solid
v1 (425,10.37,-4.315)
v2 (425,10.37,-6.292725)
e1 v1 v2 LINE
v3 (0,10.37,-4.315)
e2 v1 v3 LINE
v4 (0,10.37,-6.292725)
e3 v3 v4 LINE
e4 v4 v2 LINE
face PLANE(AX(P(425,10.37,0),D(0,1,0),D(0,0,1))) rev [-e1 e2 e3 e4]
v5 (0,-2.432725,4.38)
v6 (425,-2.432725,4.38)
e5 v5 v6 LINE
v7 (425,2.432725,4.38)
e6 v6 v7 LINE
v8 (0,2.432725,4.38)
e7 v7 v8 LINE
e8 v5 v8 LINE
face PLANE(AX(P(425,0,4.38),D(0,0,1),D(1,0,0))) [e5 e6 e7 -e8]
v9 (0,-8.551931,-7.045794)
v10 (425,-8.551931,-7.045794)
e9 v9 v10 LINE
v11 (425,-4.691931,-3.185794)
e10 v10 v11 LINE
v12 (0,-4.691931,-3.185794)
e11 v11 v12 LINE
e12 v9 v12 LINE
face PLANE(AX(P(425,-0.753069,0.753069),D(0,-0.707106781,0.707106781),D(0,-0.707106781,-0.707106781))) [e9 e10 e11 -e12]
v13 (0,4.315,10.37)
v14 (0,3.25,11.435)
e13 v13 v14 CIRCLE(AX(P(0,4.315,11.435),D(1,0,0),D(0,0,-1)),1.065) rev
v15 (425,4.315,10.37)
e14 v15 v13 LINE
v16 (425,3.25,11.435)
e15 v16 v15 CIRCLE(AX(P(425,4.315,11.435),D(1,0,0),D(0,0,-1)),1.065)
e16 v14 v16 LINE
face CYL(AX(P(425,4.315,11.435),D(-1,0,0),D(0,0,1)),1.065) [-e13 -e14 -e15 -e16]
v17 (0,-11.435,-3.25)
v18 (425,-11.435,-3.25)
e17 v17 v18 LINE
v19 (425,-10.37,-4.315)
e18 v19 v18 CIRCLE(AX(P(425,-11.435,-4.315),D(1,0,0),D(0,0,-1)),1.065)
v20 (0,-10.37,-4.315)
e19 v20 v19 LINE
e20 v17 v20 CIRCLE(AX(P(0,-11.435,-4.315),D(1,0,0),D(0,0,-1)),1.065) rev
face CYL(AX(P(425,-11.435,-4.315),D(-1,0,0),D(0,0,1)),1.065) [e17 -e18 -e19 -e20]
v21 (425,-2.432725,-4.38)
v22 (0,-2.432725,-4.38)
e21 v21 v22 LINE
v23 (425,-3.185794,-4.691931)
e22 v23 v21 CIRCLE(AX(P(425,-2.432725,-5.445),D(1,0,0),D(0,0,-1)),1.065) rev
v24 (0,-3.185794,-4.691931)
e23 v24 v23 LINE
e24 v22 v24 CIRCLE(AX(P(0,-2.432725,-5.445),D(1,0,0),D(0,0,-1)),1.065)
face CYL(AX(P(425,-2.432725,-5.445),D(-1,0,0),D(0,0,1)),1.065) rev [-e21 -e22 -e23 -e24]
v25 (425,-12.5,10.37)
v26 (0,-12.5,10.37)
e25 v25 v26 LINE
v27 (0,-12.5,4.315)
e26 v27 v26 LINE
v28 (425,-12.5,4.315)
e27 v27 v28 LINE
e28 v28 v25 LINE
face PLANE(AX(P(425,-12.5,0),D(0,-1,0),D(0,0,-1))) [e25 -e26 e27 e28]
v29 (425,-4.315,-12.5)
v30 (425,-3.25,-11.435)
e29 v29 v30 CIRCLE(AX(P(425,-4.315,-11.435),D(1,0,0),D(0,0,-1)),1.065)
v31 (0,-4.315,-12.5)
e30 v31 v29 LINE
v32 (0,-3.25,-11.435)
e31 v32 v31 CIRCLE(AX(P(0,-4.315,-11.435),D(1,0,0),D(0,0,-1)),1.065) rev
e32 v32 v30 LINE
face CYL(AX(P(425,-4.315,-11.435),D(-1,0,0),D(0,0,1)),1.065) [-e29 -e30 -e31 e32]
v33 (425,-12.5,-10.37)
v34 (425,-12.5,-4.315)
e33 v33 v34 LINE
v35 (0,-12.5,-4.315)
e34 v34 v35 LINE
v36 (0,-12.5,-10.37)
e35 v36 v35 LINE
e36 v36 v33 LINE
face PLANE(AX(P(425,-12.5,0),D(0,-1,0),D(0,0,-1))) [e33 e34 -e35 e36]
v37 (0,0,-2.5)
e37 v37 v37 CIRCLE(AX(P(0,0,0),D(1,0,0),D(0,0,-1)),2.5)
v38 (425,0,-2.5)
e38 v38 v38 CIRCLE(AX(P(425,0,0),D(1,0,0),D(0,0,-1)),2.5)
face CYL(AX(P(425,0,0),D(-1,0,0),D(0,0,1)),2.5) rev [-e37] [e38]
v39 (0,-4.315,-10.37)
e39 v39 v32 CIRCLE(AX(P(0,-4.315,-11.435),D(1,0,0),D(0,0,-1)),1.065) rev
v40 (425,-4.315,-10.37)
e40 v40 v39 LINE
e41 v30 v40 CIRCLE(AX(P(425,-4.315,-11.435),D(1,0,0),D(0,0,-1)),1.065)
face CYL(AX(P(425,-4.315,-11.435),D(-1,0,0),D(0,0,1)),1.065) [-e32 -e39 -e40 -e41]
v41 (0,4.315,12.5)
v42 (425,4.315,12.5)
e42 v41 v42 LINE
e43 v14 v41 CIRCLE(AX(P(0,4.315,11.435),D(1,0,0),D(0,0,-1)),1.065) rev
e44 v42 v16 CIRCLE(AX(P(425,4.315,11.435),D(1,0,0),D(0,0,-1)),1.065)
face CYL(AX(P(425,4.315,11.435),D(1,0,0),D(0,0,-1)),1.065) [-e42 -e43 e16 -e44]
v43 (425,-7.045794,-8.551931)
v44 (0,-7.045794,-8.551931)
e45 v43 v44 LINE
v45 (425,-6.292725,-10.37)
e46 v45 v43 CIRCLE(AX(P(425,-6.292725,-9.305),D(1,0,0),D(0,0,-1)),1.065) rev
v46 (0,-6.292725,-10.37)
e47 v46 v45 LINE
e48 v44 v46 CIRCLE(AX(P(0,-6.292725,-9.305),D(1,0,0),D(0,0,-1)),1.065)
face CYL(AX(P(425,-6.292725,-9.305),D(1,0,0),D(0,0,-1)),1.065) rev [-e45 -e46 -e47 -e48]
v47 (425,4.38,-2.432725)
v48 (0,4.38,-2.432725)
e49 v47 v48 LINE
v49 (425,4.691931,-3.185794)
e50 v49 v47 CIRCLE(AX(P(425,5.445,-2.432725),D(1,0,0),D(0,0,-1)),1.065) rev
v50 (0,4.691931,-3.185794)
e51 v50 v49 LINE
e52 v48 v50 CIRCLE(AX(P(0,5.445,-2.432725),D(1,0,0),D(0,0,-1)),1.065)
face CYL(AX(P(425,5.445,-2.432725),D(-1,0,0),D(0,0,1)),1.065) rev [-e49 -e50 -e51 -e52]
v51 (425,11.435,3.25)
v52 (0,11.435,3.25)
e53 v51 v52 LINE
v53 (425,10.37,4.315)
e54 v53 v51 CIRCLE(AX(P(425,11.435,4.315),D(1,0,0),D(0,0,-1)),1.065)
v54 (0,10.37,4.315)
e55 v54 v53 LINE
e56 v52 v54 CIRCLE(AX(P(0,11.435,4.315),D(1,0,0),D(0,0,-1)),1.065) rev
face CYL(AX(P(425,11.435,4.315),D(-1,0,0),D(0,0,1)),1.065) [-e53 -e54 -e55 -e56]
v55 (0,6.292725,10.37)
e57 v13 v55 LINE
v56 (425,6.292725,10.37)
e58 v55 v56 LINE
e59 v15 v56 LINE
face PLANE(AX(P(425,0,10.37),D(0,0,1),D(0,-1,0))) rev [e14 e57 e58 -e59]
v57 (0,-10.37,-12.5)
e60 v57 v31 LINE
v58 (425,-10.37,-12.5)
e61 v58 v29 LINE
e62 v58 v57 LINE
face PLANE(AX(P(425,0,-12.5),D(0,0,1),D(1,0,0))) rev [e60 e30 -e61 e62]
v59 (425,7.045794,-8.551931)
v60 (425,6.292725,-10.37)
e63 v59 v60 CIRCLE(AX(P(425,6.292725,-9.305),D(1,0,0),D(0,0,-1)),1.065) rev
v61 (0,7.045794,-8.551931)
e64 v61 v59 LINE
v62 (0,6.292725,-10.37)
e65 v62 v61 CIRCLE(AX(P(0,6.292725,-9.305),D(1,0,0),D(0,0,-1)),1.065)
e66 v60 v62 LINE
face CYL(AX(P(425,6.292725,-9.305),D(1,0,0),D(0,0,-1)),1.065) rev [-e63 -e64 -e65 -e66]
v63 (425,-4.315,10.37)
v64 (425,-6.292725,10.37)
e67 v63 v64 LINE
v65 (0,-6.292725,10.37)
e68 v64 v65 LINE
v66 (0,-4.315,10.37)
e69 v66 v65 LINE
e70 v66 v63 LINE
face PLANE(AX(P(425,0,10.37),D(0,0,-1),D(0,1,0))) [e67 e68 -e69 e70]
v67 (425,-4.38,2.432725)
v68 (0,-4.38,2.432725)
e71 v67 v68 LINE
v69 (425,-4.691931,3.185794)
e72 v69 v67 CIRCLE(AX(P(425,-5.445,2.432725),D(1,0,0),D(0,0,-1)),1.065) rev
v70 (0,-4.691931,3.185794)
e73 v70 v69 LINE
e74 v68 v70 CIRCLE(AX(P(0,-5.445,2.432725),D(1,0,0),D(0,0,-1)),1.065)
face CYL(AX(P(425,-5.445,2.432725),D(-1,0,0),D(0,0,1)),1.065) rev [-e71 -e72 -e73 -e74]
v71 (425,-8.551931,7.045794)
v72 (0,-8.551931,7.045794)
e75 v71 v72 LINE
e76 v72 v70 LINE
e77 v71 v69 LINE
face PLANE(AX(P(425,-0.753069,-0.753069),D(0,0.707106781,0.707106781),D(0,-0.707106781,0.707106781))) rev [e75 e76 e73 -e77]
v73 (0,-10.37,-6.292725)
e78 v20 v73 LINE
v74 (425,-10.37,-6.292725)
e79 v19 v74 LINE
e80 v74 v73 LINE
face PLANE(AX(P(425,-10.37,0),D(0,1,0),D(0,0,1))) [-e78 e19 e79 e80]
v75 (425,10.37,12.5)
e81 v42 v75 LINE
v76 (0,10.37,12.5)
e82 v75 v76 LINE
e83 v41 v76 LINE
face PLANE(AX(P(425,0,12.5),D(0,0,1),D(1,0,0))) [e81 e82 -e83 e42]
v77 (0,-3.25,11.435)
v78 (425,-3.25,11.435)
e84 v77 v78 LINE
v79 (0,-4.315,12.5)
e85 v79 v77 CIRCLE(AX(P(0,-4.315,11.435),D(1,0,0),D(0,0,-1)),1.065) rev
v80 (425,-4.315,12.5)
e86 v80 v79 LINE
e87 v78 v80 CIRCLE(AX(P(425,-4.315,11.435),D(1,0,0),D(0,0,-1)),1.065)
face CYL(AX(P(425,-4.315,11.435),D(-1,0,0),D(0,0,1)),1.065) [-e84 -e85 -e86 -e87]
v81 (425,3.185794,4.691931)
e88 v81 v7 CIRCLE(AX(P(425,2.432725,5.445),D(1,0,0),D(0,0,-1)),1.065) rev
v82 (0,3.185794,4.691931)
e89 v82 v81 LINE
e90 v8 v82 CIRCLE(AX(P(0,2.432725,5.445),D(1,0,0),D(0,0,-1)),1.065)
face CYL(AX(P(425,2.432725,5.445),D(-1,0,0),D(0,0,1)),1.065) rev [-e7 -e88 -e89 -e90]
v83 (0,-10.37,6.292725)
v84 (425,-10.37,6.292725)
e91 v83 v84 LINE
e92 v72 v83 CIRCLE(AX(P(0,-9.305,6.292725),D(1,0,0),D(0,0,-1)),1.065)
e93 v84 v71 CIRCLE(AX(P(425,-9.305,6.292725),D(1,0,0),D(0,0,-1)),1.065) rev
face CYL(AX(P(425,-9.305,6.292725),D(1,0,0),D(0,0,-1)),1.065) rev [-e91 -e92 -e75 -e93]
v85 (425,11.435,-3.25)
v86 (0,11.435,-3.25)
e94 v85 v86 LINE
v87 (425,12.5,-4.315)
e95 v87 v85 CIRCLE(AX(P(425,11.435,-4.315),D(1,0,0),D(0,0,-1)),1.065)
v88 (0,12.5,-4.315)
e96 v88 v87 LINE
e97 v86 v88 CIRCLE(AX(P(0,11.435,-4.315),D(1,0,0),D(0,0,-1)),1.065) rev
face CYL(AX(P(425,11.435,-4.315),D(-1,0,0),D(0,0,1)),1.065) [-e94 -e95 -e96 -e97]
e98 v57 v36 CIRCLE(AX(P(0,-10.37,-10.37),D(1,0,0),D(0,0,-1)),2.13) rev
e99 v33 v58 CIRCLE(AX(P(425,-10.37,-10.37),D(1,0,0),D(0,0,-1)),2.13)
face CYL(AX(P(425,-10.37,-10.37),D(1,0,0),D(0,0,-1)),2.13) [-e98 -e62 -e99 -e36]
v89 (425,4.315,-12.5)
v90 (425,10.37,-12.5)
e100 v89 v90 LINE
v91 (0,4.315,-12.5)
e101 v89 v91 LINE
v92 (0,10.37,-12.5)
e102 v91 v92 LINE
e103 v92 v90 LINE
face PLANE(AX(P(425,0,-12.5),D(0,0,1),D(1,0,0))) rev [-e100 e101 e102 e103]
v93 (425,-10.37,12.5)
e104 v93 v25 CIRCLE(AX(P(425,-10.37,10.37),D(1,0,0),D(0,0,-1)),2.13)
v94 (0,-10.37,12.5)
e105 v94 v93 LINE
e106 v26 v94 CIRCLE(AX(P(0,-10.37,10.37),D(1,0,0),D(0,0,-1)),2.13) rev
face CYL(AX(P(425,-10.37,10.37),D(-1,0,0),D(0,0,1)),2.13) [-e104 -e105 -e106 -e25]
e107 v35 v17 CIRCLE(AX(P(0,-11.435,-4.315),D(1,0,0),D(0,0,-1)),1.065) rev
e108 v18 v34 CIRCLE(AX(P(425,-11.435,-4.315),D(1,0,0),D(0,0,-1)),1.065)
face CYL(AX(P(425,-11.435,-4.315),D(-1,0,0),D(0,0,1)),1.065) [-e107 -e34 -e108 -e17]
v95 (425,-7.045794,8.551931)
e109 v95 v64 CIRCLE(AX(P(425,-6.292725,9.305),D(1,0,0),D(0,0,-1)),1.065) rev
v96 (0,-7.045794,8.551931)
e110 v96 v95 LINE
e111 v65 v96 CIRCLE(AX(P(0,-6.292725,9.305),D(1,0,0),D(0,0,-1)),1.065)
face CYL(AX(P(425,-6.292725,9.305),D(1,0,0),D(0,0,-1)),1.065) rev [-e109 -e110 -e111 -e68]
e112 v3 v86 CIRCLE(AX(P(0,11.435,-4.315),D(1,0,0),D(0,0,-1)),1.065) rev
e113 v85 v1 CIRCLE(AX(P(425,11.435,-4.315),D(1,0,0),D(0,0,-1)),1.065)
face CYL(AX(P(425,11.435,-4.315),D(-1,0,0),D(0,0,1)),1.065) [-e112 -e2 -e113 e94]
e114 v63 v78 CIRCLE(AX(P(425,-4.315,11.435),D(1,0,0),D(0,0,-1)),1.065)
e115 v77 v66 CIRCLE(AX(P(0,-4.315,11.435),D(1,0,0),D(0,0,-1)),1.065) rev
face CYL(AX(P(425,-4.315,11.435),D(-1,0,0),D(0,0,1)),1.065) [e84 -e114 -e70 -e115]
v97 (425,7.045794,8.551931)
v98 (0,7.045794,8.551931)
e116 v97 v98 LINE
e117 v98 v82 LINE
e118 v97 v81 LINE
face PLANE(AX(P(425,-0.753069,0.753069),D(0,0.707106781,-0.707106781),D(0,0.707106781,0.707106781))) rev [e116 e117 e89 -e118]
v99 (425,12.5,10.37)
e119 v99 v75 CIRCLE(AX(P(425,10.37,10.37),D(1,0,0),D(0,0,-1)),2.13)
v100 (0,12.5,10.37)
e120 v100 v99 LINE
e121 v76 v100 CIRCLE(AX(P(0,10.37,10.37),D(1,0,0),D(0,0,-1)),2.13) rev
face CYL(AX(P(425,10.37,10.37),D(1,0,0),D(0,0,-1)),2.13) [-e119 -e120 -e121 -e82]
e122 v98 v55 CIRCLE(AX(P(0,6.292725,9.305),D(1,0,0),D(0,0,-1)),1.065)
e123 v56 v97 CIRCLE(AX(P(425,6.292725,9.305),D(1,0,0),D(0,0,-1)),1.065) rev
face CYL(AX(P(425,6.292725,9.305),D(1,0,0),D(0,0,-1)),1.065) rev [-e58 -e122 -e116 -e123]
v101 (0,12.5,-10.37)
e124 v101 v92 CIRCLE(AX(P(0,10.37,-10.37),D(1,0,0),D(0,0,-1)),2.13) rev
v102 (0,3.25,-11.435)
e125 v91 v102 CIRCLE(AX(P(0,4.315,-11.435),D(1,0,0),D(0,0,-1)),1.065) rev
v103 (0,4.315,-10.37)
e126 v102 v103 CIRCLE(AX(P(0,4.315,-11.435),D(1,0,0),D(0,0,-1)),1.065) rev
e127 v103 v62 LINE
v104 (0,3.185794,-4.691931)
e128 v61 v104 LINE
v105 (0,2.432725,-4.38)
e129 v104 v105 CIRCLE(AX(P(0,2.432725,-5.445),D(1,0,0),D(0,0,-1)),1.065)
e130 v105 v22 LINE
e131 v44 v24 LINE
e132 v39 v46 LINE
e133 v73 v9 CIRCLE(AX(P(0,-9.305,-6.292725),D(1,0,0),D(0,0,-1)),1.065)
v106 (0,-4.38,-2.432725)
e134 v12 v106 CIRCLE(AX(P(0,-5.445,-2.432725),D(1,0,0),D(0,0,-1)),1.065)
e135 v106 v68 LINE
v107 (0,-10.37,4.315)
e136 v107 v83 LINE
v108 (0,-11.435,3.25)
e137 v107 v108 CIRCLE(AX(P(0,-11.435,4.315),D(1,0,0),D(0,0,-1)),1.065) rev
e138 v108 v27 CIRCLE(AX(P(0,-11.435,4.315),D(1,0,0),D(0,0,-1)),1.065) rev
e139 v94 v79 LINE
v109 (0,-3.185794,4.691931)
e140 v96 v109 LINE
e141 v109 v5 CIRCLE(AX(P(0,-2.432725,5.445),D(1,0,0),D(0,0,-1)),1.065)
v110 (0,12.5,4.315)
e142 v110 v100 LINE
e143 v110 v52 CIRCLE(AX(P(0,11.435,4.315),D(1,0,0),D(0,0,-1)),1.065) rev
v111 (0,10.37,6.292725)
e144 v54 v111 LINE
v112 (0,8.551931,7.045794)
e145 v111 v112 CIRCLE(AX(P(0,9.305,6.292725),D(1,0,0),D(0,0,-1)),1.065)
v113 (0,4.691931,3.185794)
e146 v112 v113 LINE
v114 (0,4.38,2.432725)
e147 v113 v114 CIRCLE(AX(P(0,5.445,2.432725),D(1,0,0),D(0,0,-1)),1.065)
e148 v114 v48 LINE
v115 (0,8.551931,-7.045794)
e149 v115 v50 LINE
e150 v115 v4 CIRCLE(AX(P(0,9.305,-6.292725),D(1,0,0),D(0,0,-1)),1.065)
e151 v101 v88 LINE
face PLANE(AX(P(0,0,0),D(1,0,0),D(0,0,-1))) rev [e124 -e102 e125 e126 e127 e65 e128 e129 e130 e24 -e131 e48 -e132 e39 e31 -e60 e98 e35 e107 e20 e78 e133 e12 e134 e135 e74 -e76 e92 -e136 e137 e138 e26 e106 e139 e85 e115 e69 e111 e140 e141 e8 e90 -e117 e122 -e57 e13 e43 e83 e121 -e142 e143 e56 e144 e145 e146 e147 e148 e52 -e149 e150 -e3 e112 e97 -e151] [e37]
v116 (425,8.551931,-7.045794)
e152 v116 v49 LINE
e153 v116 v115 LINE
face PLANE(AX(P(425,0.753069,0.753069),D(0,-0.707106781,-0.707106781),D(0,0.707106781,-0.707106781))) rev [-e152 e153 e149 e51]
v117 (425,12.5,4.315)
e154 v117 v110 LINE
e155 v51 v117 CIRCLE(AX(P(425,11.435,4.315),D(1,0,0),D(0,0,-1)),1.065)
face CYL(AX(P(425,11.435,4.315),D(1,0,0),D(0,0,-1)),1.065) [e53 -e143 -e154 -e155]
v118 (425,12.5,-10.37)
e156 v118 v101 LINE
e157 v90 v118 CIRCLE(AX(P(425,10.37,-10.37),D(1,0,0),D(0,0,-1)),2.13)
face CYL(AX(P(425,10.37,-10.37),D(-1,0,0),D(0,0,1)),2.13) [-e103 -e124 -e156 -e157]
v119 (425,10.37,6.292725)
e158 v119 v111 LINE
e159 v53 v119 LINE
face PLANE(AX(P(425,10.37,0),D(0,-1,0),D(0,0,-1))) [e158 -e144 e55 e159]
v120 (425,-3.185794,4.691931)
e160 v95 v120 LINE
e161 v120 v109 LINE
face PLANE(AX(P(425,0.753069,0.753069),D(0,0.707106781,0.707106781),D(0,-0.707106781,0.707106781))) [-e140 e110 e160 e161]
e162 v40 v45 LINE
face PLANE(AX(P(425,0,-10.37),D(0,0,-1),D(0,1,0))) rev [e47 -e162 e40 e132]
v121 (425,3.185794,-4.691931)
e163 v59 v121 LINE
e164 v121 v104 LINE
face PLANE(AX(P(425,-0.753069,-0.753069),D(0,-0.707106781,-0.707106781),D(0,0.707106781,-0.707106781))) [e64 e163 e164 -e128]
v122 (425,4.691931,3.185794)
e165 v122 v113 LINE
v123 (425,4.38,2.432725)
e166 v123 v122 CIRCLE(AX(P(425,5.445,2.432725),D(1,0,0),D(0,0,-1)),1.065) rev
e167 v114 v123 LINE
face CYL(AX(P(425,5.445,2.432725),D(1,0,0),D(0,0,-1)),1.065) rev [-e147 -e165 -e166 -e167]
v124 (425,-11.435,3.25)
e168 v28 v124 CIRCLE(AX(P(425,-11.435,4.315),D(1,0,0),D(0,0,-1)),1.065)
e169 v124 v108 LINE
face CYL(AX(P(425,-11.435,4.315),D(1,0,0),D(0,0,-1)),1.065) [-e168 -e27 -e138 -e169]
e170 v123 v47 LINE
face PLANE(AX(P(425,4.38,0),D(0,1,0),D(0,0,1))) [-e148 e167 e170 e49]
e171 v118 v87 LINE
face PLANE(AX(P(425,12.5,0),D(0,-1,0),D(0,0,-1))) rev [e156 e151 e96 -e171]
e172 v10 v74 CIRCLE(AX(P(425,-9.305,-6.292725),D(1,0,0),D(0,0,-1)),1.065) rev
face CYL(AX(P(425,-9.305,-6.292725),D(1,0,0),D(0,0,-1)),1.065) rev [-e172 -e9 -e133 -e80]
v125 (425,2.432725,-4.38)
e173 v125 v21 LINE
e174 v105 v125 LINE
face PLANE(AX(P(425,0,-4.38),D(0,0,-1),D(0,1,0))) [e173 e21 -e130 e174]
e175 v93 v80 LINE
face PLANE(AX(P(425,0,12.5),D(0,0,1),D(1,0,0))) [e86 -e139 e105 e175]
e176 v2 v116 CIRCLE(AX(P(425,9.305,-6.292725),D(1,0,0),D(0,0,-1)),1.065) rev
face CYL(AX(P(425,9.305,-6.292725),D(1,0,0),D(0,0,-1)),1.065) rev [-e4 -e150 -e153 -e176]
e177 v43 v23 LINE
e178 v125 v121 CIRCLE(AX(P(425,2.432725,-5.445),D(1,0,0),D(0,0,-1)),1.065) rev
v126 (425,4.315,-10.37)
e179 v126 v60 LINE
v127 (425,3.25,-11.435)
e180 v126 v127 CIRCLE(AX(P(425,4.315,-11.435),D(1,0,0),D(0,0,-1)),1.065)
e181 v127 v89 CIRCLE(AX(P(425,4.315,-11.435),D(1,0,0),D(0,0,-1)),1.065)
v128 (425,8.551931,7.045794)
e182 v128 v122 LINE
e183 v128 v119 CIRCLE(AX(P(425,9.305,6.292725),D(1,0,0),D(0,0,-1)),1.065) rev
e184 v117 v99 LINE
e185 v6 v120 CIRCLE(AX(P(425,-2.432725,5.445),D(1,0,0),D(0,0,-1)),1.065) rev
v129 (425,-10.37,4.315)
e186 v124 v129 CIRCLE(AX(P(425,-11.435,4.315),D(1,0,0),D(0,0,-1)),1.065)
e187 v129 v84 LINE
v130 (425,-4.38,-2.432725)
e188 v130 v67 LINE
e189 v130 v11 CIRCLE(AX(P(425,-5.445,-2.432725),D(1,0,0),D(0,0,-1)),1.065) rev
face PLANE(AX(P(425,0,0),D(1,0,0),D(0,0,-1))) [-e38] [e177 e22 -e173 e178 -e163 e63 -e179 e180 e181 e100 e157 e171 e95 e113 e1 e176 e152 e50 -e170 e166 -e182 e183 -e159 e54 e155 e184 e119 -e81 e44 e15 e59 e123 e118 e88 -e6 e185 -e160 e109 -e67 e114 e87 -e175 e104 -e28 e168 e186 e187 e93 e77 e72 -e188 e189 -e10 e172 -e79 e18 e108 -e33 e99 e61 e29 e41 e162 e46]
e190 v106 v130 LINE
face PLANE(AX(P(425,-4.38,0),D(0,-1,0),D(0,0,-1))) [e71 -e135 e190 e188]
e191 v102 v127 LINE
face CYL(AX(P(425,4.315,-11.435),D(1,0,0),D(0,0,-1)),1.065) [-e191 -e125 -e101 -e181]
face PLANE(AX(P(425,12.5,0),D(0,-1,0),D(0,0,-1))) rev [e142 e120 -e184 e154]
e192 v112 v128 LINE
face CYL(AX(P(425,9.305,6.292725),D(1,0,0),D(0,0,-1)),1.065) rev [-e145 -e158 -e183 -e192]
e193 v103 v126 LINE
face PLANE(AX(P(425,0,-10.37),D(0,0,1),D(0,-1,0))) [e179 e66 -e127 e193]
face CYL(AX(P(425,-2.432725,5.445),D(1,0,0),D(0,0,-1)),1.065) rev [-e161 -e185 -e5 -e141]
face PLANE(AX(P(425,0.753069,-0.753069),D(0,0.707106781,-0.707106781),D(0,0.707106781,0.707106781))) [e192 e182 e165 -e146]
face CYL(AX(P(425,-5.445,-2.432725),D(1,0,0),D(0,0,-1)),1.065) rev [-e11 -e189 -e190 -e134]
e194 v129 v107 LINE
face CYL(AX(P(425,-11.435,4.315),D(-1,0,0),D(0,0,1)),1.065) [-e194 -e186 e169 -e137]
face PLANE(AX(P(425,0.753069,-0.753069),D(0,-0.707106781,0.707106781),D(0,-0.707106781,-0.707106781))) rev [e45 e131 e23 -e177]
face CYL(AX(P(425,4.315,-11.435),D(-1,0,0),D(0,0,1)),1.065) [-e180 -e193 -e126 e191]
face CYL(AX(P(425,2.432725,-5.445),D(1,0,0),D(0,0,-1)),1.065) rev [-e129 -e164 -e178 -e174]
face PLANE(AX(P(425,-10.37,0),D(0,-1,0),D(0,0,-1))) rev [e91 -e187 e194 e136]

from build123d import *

# Parameters (mm, degrees)
SKETCH1_R           = 2.5
BOSS_EXTRUDE1_DEPTH = 425
FILLET1_R           = 1.065
FILLET2_R           = 2.13


with BuildPart() as part:
    # Sketch1 → Boss-Extrude1 (new body)
    with BuildSketch(Plane.YZ):
        Polygon((-12.5, -3.25), (-12.5, -12.5), (-3.25, -12.5), (-3.25, -10.37), (-8.863862556, -10.37), (-2.873862556, -4.38), (2.873862556, -4.38), (8.863862556, -10.37), (3.25, -10.37), (3.25, -12.5), (12.5, -12.5), (12.5, -3.25), (10.37, -3.25), (10.37, -8.863862556), (4.38, -2.873862556), (4.38, 2.873862556), (10.37, 8.863862556), (10.37, 3.25), (12.5, 3.25), (12.5, 12.5), (3.25, 12.5), (3.25, 10.37), (8.863862556, 10.37), (2.873862556, 4.38), (-2.873862556, 4.38), (-8.863862556, 10.37), (-3.25, 10.37), (-3.25, 12.5), (-12.5, 12.5), (-12.5, 3.25), (-10.37, 3.25), (-10.37, 8.863862556), (-4.38, 2.873862556), (-4.38, -2.873862556), (-10.37, -8.863862556), (-10.37, -3.25), align=None)
        with Locations(Location((0, 0, 0), (0, 0, 270))):
            Circle(SKETCH1_R, mode=Mode.SUBTRACT)
    extrude(amount=BOSS_EXTRUDE1_DEPTH)

    # Fillet1
    fillet1_edges = [part.edges().sort_by_distance(p)[0] for p in [
        (212.5, -10.37, -8.863862556),
        (212.5, 2.873862556, -4.38),
        (212.5, -2.873862556, -4.38),
        (212.5, -4.38, 2.873862556),
        (212.5, -4.38, -2.873862556),
        (212.5, -2.873862556, 4.38),
        (212.5, 2.873862556, 4.38),
        (212.5, 4.38, 2.873862556),
        (212.5, 4.38, -2.873862556),
        (212.5, -8.863862556, -10.37),
        (212.5, 8.863862556, -10.37),
        (212.5, 10.37, -8.863862556),
        (212.5, -10.37, 8.863862556),
        (212.5, -8.863862556, 10.37),
        (212.5, 10.37, 8.863862556),
        (212.5, 8.863862556, 10.37),
        (212.5, 12.5, 3.25),
        (212.5, -3.25, -12.5),
        (212.5, -10.37, 3.25),
        (212.5, 10.37, 3.25),
        (212.5, -10.37, -3.25),
        (212.5, -12.5, -3.25),
        (212.5, -12.5, 3.25),
        (212.5, 3.25, -10.37),
        (212.5, -3.25, -10.37),
        (212.5, 3.25, -12.5),
        (212.5, 10.37, -3.25),
        (212.5, 12.5, -3.25),
        (212.5, 3.25, 12.5),
        (212.5, 3.25, 10.37),
        (212.5, -3.25, 10.37),
        (212.5, -3.25, 12.5),
    ]]
    fillet(fillet1_edges, radius=FILLET1_R - 0.0001)  # a hair under: the kernel refuses the full size

    # Fillet2
    fillet2_edges = [part.edges().sort_by_distance(p)[0] for p in [
        (212.5, -12.5, 12.5),
        (212.5, 12.5, 12.5),
        (212.5, 12.5, -12.5),
        (212.5, -12.5, -12.5),
    ]]
    fillet(fillet2_edges, radius=FILLET2_R)


solid = part.part
